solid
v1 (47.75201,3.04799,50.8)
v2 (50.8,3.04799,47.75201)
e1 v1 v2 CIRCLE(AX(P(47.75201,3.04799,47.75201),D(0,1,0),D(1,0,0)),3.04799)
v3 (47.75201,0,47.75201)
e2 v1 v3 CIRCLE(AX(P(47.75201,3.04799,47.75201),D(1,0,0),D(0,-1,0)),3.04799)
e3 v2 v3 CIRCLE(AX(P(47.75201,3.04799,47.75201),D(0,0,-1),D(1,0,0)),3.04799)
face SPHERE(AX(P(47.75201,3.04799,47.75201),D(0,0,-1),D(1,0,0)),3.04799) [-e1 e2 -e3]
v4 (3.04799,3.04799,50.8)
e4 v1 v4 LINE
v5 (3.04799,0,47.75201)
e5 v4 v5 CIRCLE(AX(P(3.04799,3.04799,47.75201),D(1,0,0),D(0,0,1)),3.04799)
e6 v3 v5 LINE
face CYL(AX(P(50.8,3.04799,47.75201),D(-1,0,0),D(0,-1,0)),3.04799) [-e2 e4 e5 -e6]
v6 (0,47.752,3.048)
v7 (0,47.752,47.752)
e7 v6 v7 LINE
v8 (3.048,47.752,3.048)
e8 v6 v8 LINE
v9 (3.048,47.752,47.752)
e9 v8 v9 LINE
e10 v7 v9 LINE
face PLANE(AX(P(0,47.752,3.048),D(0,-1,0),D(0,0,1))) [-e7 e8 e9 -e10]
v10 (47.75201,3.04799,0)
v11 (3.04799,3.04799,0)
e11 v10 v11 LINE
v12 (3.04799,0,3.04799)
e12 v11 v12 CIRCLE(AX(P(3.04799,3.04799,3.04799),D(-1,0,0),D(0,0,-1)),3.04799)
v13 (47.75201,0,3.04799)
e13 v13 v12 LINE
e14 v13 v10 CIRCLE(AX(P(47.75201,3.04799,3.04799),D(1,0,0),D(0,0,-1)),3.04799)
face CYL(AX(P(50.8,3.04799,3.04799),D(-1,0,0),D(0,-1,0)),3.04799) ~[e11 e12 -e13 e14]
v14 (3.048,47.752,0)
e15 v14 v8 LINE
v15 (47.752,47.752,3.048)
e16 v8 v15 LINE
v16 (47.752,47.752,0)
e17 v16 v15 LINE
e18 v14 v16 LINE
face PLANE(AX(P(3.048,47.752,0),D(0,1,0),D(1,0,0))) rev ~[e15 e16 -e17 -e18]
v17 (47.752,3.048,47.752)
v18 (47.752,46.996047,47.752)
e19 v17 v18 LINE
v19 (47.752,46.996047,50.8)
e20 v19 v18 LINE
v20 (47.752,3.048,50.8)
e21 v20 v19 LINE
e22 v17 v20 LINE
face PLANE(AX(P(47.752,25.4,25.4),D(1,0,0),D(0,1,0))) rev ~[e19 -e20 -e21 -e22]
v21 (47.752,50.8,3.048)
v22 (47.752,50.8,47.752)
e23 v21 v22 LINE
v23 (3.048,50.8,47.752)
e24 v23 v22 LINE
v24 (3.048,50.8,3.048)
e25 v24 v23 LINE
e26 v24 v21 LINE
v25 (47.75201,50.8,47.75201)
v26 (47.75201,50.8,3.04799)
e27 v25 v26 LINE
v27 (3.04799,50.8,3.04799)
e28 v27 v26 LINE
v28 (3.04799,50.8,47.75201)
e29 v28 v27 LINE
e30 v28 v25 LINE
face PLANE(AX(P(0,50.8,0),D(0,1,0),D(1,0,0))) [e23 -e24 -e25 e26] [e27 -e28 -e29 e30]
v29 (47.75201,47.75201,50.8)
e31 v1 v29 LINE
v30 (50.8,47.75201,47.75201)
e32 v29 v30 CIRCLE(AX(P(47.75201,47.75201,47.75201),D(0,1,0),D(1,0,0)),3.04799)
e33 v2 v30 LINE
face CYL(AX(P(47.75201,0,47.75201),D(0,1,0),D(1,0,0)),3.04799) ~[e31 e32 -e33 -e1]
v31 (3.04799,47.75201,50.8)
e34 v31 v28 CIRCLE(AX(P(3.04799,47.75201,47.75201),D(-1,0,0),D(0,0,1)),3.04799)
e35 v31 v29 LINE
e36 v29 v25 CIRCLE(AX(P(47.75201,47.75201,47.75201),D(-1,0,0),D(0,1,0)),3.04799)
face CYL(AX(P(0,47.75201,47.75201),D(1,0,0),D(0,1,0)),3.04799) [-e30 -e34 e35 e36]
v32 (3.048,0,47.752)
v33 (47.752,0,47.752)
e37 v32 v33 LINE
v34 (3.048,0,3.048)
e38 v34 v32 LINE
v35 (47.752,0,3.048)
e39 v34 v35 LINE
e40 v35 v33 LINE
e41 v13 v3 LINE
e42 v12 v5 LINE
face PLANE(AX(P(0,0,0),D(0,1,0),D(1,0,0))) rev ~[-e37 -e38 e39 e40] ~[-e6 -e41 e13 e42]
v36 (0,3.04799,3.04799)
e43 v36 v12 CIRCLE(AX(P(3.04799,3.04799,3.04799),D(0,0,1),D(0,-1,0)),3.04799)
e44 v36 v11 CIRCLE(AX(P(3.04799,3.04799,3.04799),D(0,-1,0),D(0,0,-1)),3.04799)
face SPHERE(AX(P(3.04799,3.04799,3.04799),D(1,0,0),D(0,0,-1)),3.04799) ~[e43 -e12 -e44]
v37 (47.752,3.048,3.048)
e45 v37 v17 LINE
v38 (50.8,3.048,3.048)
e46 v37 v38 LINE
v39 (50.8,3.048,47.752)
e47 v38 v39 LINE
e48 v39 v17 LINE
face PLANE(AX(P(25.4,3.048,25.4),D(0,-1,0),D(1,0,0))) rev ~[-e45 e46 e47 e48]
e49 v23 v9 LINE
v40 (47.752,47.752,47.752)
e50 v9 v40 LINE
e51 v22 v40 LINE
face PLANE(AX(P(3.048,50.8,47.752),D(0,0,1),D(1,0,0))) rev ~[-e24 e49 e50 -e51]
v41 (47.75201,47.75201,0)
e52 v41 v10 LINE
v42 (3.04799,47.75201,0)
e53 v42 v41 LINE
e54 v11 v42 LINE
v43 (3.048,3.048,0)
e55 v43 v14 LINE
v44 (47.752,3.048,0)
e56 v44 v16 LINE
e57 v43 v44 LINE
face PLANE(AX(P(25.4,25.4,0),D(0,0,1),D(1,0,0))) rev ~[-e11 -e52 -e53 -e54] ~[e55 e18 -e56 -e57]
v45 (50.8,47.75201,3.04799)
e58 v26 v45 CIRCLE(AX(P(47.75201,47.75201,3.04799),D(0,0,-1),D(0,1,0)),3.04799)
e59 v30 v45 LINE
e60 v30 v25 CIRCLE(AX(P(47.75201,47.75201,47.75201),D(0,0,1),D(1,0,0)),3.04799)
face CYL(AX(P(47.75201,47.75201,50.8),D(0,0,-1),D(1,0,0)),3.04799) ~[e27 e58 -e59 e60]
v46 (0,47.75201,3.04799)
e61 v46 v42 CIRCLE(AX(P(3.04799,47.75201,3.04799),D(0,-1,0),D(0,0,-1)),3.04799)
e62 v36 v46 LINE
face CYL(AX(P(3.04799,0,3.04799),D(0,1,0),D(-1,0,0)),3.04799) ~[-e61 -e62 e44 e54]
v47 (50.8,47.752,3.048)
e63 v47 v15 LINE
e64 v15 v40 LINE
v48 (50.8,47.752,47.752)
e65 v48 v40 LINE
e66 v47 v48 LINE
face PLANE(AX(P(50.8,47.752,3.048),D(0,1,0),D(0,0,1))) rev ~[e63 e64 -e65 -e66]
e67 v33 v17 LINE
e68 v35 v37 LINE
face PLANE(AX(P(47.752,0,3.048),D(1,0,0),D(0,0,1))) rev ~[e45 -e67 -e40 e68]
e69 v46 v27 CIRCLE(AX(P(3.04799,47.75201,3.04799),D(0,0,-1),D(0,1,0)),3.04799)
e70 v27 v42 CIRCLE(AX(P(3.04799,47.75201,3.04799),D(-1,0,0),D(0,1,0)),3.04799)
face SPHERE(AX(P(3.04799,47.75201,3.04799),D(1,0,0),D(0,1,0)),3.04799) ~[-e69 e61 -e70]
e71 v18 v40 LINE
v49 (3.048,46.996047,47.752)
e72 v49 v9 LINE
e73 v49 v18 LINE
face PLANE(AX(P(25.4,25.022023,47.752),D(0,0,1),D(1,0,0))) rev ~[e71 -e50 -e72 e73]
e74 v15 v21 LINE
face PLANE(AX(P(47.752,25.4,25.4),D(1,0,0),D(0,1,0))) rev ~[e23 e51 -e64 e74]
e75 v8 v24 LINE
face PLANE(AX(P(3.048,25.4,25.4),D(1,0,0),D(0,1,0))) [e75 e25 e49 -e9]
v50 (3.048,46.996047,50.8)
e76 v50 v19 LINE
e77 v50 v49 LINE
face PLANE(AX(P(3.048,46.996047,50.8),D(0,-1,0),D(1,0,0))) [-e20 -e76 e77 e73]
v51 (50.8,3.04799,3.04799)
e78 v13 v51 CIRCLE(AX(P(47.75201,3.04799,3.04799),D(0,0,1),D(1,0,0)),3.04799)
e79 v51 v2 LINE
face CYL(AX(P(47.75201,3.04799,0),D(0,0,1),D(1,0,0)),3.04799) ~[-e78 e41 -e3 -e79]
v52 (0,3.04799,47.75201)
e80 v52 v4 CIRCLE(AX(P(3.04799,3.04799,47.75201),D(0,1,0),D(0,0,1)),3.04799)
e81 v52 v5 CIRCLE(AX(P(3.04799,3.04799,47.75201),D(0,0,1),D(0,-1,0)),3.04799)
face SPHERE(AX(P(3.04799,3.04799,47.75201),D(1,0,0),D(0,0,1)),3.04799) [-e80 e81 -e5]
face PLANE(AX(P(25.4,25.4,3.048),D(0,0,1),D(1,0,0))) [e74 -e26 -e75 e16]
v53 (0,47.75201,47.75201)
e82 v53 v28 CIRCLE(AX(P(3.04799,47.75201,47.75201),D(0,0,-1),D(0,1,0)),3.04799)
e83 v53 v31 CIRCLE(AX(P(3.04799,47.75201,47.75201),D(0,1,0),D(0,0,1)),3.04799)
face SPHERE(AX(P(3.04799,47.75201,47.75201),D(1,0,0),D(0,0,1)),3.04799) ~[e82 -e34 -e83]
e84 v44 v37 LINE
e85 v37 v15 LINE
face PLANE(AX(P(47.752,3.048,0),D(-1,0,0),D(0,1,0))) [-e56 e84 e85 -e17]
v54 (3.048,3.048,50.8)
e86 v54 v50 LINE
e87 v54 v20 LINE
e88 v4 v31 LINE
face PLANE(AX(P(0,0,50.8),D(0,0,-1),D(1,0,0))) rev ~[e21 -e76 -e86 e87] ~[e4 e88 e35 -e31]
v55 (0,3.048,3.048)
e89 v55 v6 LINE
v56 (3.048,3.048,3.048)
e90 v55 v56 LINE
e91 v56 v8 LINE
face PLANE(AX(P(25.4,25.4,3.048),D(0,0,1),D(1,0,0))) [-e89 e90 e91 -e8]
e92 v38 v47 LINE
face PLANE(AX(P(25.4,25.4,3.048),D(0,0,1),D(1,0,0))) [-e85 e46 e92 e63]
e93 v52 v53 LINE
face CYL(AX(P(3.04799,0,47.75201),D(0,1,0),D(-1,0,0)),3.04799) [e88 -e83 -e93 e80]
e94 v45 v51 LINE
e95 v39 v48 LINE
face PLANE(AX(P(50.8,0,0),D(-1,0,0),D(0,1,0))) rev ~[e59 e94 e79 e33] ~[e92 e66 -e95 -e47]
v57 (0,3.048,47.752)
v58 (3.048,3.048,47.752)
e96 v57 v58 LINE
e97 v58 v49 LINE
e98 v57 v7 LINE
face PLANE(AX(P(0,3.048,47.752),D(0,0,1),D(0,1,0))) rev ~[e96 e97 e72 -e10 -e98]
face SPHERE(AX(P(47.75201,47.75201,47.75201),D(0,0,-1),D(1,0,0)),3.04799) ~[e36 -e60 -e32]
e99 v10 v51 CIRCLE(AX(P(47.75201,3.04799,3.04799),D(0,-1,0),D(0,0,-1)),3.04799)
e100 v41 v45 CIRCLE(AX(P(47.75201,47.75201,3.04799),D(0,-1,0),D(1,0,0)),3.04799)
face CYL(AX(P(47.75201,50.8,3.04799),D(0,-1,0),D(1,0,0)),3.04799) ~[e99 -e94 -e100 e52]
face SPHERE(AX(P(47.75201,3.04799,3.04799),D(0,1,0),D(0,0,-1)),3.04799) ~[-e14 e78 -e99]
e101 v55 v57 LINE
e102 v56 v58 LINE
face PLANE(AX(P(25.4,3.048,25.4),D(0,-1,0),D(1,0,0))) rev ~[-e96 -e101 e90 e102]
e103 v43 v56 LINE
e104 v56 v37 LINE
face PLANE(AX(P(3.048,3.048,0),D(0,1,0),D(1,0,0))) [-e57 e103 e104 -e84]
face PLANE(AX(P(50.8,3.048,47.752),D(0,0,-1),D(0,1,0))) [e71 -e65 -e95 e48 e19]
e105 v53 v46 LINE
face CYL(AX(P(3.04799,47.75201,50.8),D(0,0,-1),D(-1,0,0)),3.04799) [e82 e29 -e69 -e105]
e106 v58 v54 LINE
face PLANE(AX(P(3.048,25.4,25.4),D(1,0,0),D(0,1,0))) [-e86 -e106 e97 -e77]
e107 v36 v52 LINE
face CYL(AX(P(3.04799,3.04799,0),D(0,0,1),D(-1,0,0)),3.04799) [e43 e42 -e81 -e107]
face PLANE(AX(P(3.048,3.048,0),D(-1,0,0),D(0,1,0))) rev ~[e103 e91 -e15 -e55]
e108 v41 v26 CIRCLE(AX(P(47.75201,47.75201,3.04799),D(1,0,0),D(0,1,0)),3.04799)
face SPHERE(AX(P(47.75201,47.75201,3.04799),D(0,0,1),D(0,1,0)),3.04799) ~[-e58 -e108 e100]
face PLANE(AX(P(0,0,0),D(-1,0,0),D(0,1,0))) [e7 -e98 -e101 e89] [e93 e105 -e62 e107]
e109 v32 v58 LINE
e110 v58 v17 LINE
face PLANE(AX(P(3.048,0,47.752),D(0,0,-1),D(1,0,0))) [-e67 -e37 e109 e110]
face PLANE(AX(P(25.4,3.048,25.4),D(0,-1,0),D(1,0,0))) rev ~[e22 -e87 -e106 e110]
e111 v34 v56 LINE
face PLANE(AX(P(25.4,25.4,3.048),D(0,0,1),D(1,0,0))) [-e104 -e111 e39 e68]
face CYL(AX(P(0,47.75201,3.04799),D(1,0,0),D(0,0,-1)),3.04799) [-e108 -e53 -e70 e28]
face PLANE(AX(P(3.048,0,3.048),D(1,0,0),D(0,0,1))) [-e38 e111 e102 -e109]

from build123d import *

# Parameters (mm, degrees)
F0_W      = 50.8
F0_H      = 50.8
F0_W_2    = 44.704000783
F0_H_2    = 44.704000783
F9_DEPTH  = 3.048
F1_W      = 50.8
F1_H      = 50.8
F1_W_2    = 44.704000783
F1_H_2    = 44.704000783
F10_DEPTH = 3.048
F2_W      = 50.8
F2_H      = 50.8
F2_W_2    = 44.704000783
F2_H_2    = 44.704000783
F11_DEPTH = 3.048
F6_W      = 50.8
F6_H      = 50.8
F6_W_2    = 44.704000783
F6_H_2    = 44.704000783
F12_DEPTH = 3.048
F7_W      = 50.8
F7_H      = 50.8
F7_W_2    = 44.704000783
F7_H_2    = 44.704000783
F13_DEPTH = 3.048
F8_W      = 50.8
F8_H      = 50.0440469261
F8_W_2    = 44.7040001482
F8_H_2    = 43.9480470743
F14_DEPTH = 3.048
F15_R     = 3.04799


# Not quite as in the source:
# - a fillet or chamfer is up to 0.001 mm smaller than in the source, because OpenCascade refuses the exact size


with BuildPart() as f9:
    # F0 (on Top) → F9 (new body)
    with BuildSketch(Plane.XY):
        with Locations((25.4, 25.4)):
            Rectangle(F0_W, F0_H)
        with Locations((25.4, 25.4)):
            Rectangle(F0_W_2, F0_H_2, mode=Mode.SUBTRACT)
    extrude(amount=F9_DEPTH)

    # F1 (on Front) → F10 (join)
    with BuildSketch(Plane.XZ):
        with Locations((25.4, 25.4)):
            Rectangle(F1_W, F1_H)
        with Locations((25.4, 25.4)):
            Rectangle(F1_W_2, F1_H_2, mode=Mode.SUBTRACT)
    extrude(amount=-F10_DEPTH)

    # F2 (on Right) → F11 (join)
    with BuildSketch(Plane.YZ):
        with Locations((25.4, 25.4)):
            Rectangle(F2_W, F2_H)
        with Locations((25.4, 25.4)):
            Rectangle(F2_W_2, F2_H_2, mode=Mode.SUBTRACT)
    extrude(amount=F11_DEPTH)

    # F6 (on offset) → F12 (join)
    with BuildSketch(Plane.YZ.offset(50.8)):
        with Locations((25.4, 25.4)):
            Rectangle(F6_W, F6_H)
        with Locations((25.4, 25.4)):
            Rectangle(F6_W_2, F6_H_2, mode=Mode.SUBTRACT)
    extrude(amount=-F12_DEPTH)

    # F7 (on offset) → F13 (join)
    with BuildSketch(Plane.XZ.offset(-50.8)):
        with Locations((25.4, 25.4)):
            Rectangle(F7_W, F7_H)
        with Locations((25.4, 25.4)):
            Rectangle(F7_W_2, F7_H_2, mode=Mode.SUBTRACT)
    extrude(amount=F13_DEPTH)

    # F8 (on offset) → F14 (join)
    with BuildSketch(Plane.XY.offset(50.8)):
        with Locations((25.4, 25.022023463)):
            Rectangle(F8_W, F8_H)
        with Locations((25.4, 25.022023463)):
            Rectangle(F8_W_2, F8_H_2, mode=Mode.SUBTRACT)
    extrude(amount=-F14_DEPTH)

    # F15 (radius 3.048 in the source; OpenCascade refuses exactly that, so slightly less here)
    f15_edges = [f9.edges().sort_by_distance(p)[0] for p in [
        (50.8, 50.8, 25.4),
        (25.4, 50.8, 0),
        (50.8, 25.4, 0),
        (25.4, 0, 0),
        (50.8, 0, 25.4),
        (50.8, 25.4, 50.8),
        (25.4, 50.8, 50.8),
        (25.4, 0, 50.8),
        (0, 25.4, 50.8),
        (0, 50.8, 25.4),
        (0, 25.4, 0),
        (0, 0, 25.4),
    ]]
    fillet(f15_edges, radius=F15_R)


solid = f9.part
